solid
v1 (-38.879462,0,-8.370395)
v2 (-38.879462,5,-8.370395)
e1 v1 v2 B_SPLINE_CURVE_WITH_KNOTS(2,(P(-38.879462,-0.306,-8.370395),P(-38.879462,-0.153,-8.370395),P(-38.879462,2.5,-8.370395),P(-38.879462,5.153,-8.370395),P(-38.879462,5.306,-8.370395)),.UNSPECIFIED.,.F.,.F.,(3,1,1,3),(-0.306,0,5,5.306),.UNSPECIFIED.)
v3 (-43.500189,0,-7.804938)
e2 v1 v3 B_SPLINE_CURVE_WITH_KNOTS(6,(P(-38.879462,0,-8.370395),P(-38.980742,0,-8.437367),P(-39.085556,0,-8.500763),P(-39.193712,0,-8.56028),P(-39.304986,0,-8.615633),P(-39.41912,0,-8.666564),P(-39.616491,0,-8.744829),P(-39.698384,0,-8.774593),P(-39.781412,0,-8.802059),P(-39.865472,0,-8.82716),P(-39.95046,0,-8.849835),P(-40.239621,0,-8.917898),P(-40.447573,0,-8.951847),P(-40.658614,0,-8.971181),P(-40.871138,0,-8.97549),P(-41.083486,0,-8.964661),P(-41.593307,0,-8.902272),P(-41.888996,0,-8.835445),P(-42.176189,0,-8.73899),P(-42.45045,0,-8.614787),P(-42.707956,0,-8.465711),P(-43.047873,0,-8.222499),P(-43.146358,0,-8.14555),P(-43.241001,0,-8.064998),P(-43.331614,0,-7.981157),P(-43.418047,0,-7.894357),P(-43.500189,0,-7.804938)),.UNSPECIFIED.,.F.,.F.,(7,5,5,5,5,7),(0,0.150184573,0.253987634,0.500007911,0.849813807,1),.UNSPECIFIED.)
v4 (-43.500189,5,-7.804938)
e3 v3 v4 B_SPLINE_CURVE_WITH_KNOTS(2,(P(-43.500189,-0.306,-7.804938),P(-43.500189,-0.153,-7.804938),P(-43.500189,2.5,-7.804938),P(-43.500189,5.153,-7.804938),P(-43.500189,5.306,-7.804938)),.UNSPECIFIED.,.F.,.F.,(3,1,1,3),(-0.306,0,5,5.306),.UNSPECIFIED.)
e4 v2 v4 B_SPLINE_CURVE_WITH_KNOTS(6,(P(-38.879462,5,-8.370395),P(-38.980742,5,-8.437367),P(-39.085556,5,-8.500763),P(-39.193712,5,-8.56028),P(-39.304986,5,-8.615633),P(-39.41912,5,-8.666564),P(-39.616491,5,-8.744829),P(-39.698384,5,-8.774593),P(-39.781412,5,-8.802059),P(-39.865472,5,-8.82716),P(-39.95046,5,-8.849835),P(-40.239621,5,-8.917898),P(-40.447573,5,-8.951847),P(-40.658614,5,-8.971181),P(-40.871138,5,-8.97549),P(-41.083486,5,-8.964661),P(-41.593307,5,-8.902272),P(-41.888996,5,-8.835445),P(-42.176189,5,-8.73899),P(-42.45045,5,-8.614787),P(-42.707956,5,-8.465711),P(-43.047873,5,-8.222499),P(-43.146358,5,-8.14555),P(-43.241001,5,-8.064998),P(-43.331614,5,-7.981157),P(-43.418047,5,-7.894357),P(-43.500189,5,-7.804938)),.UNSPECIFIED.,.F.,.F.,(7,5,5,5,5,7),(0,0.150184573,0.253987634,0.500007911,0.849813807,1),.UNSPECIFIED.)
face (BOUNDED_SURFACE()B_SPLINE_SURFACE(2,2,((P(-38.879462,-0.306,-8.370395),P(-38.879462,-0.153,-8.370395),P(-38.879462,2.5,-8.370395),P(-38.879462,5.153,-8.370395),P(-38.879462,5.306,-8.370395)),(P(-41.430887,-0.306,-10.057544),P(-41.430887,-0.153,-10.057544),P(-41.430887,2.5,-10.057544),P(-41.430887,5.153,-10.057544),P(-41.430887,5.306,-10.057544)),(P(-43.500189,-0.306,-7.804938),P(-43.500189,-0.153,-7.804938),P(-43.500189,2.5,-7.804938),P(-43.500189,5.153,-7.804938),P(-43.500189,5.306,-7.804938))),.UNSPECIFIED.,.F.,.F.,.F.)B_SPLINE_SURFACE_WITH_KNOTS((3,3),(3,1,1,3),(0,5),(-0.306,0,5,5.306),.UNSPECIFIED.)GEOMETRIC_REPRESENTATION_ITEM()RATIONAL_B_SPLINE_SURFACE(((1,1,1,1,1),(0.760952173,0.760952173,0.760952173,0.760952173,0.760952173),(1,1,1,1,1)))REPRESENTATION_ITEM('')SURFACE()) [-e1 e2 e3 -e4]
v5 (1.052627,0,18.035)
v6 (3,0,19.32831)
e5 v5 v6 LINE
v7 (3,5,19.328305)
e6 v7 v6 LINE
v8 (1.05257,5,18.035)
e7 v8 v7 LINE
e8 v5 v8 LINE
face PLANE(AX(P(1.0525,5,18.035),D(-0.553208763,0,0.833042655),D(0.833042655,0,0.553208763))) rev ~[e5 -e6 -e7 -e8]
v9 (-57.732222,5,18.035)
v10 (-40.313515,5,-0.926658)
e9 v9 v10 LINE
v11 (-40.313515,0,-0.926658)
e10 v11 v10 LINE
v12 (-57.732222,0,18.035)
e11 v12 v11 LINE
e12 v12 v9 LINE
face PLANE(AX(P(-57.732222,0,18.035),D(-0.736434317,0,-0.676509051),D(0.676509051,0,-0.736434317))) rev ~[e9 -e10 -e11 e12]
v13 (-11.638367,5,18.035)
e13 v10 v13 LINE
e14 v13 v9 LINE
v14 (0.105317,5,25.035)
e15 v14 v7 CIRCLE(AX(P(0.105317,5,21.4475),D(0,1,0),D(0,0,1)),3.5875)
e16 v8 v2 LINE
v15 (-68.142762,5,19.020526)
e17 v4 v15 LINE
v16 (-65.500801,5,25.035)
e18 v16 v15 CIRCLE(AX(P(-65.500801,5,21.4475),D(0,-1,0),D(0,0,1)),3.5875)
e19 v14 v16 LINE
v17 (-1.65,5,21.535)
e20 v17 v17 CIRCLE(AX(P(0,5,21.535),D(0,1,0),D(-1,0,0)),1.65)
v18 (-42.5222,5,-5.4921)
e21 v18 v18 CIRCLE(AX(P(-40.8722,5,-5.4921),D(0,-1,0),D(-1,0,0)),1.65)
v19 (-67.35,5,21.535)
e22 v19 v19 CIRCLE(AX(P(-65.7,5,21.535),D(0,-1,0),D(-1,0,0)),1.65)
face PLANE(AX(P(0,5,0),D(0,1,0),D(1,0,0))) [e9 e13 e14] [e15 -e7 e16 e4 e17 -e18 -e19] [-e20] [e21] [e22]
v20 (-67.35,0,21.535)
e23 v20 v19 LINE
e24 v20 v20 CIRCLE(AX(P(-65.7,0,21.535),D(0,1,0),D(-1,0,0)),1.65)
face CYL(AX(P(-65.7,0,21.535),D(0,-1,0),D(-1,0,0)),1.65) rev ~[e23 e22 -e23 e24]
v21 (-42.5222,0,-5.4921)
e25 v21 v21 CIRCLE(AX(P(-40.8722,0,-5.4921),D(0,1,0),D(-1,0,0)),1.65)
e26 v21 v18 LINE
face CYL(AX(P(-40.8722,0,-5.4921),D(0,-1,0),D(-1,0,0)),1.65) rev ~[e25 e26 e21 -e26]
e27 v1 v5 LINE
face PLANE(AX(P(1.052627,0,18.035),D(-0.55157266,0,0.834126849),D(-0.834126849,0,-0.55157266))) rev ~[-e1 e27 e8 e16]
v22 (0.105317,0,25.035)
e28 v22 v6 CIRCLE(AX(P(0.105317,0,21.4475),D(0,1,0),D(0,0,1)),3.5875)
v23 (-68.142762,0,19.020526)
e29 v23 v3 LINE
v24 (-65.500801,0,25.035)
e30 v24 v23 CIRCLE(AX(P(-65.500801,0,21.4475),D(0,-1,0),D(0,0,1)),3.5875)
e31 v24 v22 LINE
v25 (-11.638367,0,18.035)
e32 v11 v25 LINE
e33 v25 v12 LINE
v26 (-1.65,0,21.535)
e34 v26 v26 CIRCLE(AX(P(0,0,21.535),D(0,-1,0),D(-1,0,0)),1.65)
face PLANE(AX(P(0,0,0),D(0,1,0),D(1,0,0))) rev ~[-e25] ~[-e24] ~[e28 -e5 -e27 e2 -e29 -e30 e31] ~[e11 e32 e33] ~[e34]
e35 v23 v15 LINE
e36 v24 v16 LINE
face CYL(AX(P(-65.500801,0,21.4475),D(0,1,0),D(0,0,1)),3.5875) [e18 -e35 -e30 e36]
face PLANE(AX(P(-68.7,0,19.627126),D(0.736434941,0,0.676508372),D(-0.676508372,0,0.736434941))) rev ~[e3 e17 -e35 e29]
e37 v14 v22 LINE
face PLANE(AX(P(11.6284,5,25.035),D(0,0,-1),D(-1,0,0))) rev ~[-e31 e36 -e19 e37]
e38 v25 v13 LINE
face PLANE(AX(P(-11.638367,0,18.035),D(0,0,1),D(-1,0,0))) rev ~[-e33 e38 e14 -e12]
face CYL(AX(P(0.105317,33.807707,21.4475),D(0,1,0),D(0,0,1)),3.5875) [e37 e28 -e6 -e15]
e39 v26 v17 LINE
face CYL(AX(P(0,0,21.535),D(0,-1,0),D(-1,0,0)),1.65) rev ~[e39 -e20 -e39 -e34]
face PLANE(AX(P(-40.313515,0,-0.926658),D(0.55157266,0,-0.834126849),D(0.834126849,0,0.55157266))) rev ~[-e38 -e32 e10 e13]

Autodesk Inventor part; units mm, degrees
ref_plane "YZ Plane" through (0, 0, 0) normal (1, 0, 0) x (0, 1, 0)
ref_plane "XZ Plane" through (0, 0, 0) normal (0, 1, 0) x (-1, 0, 0)
ref_plane "XY Plane" through (0, 0, 0) normal (0, 0, 1) x (1, 0, 0)
sketch "Sketch1" plane through (0, 0, 0) normal (0, 1, 0) x (-1, 0, 0)
  line L0 (0, 21.535) -> (65.7, 21.535)
  line L1 (0, 21.535) -> (40.8722, -5.4921)
  line L2 (0, 21.535) -> (49, 21.535) construction
  line L3 (40.8722, -5.4921) -> (65.7, 21.535)
  line L4 (65.7, 21.535) -> (68.7, 21.535)
  line L5 (68.7, 21.535) -> (0, 21.535)
  line L6 (0, 21.535) -> (-3, 21.535)
  line L7 (40.8722, -5.4921) -> (43.3746, -7.1468)
  line L8 (65.7, 21.535) -> (38.8426, -7.7015)
  line L9 (137.4, 18.035) -> (137.4, 25.035)
  line L10 (137.4, 25.035) -> (0, 25.035)
  line L11 (0, 25.035) -> (0, 18.035)
  line L12 (0, 18.035) -> (137.4, 18.035)
  line L13 (137.4, 18.035) -> (0, 25.035) construction
  line L14 (137.4, 25.035) -> (0, 18.035) construction
  line L15 (93.1053, 46.1943) -> (87.9503, 50.9298)
  line L16 (87.9503, 50.9298) -> (38.2947, -3.1243)
  line L17 (38.2947, -3.1243) -> (43.4497, -7.8599)
  line L18 (43.4497, -7.8599) -> (93.1053, 46.1943)
  line L19 (93.1053, 46.1943) -> (38.2947, -3.1243) construction
  line L20 (87.9503, 50.9298) -> (43.4497, -7.8599) construction
  line L21 (79.8139, -35.4386) -> (83.6749, -29.5997)
  line L22 (83.6749, -29.5997) -> (1.9305, 24.4544)
  line L23 (1.9305, 24.4544) -> (-1.9305, 18.6155)
  line L24 (-1.9305, 18.6155) -> (79.8139, -35.4386)
  line L25 (79.8139, -35.4386) -> (1.9305, 24.4544) construction
  line L26 (83.6749, -29.5997) -> (-1.9305, 18.6155) construction
  line L27 (38.8426, -7.7015) -> (38.4743, -8.1025)
  line L28 (68.7, 21.535) -> (68.7, 25.035)
  line L29 (68.7, 21.535) -> (68.7, 18.035)
  line L30 (0, 25.035) -> (-3, 25.035)
  line L31 (-3, 25.035) -> (-3, 18.035)
  line L32 (-3, 18.035) -> (0, 18.035)
  line L33 (50.67, 0) -> (41.4309, -10.0576)
  circle A0 centre (65.7, 21.535) radius 1.65
  circle A1 centre (40.8722, -5.4921) radius 1.65
  circle A2 centre (0, 21.535) radius 1.65
  point P0 (0, 0)
  point P1 (40.3135, -0.9267)
  point P2 (11.6384, 18.035)
  point P3 (57.7322, 18.035)
  point P4 (-1.0525, 18.035)
  point P5 (73.6678, 25.035)
  dimension "d0" = 65.7
  dimension "d2" = 33.475
  dimension "d3" = 3
  dimension "d4" = 3
  dimension "d7" = 39.7
  dimension "d8" = 7
  dimension "d9" = 7
  dimension "d10" = 7
  dimension "d11" = 3.3
  dimension "d12" = 3.3
  dimension "d13" = 3.3
extrude "Extrusion1" add sketch "Sketch1" along normal blind 5 contours A2 L23 L22 L0 | L0 L22 L12 L1 A2 | L1 L12 L11 A2 | A2 L23 L24 L32 L31 L6 | L6 L31 L30 L11 A2 | L11 L10 L16 L0 L22 L23 A2 | L11 L32 L24 L23 A2 | L0 L16 L12 L22 | L12 L22 L16 L17 A1 L1 | L1 A1 L8 L27 L24 L32 L12 | L16 L10 L28 L4 A0 L0 | L0 A0 L3 L12 L16 | L12 L3 L22 L16 | L22 L3 A1 L17 L16 | A1 L17 L33 L24 L27 L8 | L10 L18 L29 L28 | L4 L29 L18 L12 L3 A0 | L12 L18 L22 L3 | L22 L18 L17 A1 L3
sketch "Sketch2" plane through (0, 5, 0) normal (0, 1, 0) x (1, 0, 0)
  line L0 (1.0525, -18.035) -> (-41.4309, 10.0576) projected
  line L1 (-41.4309, 10.0576) -> (11.6284, -25.035)
  line L2 (-41.4309, 10.0576) -> (22.1833, 10.0576) construction
  line L3 (-73.6678, -25.035) -> (3, -25.035) projected
  line L4 (11.6284, -25.035) -> (3, -25.035)
  line L5 (3, -25.035) -> (3, -18.035) projected
  line L6 (3, -18.035) -> (3, -25.035)
  point P0 (0, 0)
  point P1 (3, -19.3283)
  dimension "d16" = 33.48
extrude "Extrusion2" add sketch "Sketch2" against normal up to surface (5 mm away)
sketch "Sketch3" plane through (0, 5, 0) normal (0, 1, 0) x (1, 0, 0)
  line L0 (3, -18.035) -> (1.0525, -18.035) projected
  line L1 (11.6284, -25.035) -> (3, -19.3283) projected
  line L2 (1.0525, -18.035) -> (3, -19.3283)
  line L3 (3, -19.3283) -> (3, -18.035)
  line L4 (3, -18.035) -> (1.0525, -18.035)
  point P0 (0, 0)
extrude "Extrusion3" cut sketch "Sketch3" against normal blind 10
fillet "Fillet1" radius 3.5875 2 edges at (-73.6678, 2.5, 25.035) (-41.4309, 2.5, -10.0576)
fillet "Fillet2" radius 3.5875 1 edges at (11.6284, 2.5, 25.035)
properties part number "ghi"
